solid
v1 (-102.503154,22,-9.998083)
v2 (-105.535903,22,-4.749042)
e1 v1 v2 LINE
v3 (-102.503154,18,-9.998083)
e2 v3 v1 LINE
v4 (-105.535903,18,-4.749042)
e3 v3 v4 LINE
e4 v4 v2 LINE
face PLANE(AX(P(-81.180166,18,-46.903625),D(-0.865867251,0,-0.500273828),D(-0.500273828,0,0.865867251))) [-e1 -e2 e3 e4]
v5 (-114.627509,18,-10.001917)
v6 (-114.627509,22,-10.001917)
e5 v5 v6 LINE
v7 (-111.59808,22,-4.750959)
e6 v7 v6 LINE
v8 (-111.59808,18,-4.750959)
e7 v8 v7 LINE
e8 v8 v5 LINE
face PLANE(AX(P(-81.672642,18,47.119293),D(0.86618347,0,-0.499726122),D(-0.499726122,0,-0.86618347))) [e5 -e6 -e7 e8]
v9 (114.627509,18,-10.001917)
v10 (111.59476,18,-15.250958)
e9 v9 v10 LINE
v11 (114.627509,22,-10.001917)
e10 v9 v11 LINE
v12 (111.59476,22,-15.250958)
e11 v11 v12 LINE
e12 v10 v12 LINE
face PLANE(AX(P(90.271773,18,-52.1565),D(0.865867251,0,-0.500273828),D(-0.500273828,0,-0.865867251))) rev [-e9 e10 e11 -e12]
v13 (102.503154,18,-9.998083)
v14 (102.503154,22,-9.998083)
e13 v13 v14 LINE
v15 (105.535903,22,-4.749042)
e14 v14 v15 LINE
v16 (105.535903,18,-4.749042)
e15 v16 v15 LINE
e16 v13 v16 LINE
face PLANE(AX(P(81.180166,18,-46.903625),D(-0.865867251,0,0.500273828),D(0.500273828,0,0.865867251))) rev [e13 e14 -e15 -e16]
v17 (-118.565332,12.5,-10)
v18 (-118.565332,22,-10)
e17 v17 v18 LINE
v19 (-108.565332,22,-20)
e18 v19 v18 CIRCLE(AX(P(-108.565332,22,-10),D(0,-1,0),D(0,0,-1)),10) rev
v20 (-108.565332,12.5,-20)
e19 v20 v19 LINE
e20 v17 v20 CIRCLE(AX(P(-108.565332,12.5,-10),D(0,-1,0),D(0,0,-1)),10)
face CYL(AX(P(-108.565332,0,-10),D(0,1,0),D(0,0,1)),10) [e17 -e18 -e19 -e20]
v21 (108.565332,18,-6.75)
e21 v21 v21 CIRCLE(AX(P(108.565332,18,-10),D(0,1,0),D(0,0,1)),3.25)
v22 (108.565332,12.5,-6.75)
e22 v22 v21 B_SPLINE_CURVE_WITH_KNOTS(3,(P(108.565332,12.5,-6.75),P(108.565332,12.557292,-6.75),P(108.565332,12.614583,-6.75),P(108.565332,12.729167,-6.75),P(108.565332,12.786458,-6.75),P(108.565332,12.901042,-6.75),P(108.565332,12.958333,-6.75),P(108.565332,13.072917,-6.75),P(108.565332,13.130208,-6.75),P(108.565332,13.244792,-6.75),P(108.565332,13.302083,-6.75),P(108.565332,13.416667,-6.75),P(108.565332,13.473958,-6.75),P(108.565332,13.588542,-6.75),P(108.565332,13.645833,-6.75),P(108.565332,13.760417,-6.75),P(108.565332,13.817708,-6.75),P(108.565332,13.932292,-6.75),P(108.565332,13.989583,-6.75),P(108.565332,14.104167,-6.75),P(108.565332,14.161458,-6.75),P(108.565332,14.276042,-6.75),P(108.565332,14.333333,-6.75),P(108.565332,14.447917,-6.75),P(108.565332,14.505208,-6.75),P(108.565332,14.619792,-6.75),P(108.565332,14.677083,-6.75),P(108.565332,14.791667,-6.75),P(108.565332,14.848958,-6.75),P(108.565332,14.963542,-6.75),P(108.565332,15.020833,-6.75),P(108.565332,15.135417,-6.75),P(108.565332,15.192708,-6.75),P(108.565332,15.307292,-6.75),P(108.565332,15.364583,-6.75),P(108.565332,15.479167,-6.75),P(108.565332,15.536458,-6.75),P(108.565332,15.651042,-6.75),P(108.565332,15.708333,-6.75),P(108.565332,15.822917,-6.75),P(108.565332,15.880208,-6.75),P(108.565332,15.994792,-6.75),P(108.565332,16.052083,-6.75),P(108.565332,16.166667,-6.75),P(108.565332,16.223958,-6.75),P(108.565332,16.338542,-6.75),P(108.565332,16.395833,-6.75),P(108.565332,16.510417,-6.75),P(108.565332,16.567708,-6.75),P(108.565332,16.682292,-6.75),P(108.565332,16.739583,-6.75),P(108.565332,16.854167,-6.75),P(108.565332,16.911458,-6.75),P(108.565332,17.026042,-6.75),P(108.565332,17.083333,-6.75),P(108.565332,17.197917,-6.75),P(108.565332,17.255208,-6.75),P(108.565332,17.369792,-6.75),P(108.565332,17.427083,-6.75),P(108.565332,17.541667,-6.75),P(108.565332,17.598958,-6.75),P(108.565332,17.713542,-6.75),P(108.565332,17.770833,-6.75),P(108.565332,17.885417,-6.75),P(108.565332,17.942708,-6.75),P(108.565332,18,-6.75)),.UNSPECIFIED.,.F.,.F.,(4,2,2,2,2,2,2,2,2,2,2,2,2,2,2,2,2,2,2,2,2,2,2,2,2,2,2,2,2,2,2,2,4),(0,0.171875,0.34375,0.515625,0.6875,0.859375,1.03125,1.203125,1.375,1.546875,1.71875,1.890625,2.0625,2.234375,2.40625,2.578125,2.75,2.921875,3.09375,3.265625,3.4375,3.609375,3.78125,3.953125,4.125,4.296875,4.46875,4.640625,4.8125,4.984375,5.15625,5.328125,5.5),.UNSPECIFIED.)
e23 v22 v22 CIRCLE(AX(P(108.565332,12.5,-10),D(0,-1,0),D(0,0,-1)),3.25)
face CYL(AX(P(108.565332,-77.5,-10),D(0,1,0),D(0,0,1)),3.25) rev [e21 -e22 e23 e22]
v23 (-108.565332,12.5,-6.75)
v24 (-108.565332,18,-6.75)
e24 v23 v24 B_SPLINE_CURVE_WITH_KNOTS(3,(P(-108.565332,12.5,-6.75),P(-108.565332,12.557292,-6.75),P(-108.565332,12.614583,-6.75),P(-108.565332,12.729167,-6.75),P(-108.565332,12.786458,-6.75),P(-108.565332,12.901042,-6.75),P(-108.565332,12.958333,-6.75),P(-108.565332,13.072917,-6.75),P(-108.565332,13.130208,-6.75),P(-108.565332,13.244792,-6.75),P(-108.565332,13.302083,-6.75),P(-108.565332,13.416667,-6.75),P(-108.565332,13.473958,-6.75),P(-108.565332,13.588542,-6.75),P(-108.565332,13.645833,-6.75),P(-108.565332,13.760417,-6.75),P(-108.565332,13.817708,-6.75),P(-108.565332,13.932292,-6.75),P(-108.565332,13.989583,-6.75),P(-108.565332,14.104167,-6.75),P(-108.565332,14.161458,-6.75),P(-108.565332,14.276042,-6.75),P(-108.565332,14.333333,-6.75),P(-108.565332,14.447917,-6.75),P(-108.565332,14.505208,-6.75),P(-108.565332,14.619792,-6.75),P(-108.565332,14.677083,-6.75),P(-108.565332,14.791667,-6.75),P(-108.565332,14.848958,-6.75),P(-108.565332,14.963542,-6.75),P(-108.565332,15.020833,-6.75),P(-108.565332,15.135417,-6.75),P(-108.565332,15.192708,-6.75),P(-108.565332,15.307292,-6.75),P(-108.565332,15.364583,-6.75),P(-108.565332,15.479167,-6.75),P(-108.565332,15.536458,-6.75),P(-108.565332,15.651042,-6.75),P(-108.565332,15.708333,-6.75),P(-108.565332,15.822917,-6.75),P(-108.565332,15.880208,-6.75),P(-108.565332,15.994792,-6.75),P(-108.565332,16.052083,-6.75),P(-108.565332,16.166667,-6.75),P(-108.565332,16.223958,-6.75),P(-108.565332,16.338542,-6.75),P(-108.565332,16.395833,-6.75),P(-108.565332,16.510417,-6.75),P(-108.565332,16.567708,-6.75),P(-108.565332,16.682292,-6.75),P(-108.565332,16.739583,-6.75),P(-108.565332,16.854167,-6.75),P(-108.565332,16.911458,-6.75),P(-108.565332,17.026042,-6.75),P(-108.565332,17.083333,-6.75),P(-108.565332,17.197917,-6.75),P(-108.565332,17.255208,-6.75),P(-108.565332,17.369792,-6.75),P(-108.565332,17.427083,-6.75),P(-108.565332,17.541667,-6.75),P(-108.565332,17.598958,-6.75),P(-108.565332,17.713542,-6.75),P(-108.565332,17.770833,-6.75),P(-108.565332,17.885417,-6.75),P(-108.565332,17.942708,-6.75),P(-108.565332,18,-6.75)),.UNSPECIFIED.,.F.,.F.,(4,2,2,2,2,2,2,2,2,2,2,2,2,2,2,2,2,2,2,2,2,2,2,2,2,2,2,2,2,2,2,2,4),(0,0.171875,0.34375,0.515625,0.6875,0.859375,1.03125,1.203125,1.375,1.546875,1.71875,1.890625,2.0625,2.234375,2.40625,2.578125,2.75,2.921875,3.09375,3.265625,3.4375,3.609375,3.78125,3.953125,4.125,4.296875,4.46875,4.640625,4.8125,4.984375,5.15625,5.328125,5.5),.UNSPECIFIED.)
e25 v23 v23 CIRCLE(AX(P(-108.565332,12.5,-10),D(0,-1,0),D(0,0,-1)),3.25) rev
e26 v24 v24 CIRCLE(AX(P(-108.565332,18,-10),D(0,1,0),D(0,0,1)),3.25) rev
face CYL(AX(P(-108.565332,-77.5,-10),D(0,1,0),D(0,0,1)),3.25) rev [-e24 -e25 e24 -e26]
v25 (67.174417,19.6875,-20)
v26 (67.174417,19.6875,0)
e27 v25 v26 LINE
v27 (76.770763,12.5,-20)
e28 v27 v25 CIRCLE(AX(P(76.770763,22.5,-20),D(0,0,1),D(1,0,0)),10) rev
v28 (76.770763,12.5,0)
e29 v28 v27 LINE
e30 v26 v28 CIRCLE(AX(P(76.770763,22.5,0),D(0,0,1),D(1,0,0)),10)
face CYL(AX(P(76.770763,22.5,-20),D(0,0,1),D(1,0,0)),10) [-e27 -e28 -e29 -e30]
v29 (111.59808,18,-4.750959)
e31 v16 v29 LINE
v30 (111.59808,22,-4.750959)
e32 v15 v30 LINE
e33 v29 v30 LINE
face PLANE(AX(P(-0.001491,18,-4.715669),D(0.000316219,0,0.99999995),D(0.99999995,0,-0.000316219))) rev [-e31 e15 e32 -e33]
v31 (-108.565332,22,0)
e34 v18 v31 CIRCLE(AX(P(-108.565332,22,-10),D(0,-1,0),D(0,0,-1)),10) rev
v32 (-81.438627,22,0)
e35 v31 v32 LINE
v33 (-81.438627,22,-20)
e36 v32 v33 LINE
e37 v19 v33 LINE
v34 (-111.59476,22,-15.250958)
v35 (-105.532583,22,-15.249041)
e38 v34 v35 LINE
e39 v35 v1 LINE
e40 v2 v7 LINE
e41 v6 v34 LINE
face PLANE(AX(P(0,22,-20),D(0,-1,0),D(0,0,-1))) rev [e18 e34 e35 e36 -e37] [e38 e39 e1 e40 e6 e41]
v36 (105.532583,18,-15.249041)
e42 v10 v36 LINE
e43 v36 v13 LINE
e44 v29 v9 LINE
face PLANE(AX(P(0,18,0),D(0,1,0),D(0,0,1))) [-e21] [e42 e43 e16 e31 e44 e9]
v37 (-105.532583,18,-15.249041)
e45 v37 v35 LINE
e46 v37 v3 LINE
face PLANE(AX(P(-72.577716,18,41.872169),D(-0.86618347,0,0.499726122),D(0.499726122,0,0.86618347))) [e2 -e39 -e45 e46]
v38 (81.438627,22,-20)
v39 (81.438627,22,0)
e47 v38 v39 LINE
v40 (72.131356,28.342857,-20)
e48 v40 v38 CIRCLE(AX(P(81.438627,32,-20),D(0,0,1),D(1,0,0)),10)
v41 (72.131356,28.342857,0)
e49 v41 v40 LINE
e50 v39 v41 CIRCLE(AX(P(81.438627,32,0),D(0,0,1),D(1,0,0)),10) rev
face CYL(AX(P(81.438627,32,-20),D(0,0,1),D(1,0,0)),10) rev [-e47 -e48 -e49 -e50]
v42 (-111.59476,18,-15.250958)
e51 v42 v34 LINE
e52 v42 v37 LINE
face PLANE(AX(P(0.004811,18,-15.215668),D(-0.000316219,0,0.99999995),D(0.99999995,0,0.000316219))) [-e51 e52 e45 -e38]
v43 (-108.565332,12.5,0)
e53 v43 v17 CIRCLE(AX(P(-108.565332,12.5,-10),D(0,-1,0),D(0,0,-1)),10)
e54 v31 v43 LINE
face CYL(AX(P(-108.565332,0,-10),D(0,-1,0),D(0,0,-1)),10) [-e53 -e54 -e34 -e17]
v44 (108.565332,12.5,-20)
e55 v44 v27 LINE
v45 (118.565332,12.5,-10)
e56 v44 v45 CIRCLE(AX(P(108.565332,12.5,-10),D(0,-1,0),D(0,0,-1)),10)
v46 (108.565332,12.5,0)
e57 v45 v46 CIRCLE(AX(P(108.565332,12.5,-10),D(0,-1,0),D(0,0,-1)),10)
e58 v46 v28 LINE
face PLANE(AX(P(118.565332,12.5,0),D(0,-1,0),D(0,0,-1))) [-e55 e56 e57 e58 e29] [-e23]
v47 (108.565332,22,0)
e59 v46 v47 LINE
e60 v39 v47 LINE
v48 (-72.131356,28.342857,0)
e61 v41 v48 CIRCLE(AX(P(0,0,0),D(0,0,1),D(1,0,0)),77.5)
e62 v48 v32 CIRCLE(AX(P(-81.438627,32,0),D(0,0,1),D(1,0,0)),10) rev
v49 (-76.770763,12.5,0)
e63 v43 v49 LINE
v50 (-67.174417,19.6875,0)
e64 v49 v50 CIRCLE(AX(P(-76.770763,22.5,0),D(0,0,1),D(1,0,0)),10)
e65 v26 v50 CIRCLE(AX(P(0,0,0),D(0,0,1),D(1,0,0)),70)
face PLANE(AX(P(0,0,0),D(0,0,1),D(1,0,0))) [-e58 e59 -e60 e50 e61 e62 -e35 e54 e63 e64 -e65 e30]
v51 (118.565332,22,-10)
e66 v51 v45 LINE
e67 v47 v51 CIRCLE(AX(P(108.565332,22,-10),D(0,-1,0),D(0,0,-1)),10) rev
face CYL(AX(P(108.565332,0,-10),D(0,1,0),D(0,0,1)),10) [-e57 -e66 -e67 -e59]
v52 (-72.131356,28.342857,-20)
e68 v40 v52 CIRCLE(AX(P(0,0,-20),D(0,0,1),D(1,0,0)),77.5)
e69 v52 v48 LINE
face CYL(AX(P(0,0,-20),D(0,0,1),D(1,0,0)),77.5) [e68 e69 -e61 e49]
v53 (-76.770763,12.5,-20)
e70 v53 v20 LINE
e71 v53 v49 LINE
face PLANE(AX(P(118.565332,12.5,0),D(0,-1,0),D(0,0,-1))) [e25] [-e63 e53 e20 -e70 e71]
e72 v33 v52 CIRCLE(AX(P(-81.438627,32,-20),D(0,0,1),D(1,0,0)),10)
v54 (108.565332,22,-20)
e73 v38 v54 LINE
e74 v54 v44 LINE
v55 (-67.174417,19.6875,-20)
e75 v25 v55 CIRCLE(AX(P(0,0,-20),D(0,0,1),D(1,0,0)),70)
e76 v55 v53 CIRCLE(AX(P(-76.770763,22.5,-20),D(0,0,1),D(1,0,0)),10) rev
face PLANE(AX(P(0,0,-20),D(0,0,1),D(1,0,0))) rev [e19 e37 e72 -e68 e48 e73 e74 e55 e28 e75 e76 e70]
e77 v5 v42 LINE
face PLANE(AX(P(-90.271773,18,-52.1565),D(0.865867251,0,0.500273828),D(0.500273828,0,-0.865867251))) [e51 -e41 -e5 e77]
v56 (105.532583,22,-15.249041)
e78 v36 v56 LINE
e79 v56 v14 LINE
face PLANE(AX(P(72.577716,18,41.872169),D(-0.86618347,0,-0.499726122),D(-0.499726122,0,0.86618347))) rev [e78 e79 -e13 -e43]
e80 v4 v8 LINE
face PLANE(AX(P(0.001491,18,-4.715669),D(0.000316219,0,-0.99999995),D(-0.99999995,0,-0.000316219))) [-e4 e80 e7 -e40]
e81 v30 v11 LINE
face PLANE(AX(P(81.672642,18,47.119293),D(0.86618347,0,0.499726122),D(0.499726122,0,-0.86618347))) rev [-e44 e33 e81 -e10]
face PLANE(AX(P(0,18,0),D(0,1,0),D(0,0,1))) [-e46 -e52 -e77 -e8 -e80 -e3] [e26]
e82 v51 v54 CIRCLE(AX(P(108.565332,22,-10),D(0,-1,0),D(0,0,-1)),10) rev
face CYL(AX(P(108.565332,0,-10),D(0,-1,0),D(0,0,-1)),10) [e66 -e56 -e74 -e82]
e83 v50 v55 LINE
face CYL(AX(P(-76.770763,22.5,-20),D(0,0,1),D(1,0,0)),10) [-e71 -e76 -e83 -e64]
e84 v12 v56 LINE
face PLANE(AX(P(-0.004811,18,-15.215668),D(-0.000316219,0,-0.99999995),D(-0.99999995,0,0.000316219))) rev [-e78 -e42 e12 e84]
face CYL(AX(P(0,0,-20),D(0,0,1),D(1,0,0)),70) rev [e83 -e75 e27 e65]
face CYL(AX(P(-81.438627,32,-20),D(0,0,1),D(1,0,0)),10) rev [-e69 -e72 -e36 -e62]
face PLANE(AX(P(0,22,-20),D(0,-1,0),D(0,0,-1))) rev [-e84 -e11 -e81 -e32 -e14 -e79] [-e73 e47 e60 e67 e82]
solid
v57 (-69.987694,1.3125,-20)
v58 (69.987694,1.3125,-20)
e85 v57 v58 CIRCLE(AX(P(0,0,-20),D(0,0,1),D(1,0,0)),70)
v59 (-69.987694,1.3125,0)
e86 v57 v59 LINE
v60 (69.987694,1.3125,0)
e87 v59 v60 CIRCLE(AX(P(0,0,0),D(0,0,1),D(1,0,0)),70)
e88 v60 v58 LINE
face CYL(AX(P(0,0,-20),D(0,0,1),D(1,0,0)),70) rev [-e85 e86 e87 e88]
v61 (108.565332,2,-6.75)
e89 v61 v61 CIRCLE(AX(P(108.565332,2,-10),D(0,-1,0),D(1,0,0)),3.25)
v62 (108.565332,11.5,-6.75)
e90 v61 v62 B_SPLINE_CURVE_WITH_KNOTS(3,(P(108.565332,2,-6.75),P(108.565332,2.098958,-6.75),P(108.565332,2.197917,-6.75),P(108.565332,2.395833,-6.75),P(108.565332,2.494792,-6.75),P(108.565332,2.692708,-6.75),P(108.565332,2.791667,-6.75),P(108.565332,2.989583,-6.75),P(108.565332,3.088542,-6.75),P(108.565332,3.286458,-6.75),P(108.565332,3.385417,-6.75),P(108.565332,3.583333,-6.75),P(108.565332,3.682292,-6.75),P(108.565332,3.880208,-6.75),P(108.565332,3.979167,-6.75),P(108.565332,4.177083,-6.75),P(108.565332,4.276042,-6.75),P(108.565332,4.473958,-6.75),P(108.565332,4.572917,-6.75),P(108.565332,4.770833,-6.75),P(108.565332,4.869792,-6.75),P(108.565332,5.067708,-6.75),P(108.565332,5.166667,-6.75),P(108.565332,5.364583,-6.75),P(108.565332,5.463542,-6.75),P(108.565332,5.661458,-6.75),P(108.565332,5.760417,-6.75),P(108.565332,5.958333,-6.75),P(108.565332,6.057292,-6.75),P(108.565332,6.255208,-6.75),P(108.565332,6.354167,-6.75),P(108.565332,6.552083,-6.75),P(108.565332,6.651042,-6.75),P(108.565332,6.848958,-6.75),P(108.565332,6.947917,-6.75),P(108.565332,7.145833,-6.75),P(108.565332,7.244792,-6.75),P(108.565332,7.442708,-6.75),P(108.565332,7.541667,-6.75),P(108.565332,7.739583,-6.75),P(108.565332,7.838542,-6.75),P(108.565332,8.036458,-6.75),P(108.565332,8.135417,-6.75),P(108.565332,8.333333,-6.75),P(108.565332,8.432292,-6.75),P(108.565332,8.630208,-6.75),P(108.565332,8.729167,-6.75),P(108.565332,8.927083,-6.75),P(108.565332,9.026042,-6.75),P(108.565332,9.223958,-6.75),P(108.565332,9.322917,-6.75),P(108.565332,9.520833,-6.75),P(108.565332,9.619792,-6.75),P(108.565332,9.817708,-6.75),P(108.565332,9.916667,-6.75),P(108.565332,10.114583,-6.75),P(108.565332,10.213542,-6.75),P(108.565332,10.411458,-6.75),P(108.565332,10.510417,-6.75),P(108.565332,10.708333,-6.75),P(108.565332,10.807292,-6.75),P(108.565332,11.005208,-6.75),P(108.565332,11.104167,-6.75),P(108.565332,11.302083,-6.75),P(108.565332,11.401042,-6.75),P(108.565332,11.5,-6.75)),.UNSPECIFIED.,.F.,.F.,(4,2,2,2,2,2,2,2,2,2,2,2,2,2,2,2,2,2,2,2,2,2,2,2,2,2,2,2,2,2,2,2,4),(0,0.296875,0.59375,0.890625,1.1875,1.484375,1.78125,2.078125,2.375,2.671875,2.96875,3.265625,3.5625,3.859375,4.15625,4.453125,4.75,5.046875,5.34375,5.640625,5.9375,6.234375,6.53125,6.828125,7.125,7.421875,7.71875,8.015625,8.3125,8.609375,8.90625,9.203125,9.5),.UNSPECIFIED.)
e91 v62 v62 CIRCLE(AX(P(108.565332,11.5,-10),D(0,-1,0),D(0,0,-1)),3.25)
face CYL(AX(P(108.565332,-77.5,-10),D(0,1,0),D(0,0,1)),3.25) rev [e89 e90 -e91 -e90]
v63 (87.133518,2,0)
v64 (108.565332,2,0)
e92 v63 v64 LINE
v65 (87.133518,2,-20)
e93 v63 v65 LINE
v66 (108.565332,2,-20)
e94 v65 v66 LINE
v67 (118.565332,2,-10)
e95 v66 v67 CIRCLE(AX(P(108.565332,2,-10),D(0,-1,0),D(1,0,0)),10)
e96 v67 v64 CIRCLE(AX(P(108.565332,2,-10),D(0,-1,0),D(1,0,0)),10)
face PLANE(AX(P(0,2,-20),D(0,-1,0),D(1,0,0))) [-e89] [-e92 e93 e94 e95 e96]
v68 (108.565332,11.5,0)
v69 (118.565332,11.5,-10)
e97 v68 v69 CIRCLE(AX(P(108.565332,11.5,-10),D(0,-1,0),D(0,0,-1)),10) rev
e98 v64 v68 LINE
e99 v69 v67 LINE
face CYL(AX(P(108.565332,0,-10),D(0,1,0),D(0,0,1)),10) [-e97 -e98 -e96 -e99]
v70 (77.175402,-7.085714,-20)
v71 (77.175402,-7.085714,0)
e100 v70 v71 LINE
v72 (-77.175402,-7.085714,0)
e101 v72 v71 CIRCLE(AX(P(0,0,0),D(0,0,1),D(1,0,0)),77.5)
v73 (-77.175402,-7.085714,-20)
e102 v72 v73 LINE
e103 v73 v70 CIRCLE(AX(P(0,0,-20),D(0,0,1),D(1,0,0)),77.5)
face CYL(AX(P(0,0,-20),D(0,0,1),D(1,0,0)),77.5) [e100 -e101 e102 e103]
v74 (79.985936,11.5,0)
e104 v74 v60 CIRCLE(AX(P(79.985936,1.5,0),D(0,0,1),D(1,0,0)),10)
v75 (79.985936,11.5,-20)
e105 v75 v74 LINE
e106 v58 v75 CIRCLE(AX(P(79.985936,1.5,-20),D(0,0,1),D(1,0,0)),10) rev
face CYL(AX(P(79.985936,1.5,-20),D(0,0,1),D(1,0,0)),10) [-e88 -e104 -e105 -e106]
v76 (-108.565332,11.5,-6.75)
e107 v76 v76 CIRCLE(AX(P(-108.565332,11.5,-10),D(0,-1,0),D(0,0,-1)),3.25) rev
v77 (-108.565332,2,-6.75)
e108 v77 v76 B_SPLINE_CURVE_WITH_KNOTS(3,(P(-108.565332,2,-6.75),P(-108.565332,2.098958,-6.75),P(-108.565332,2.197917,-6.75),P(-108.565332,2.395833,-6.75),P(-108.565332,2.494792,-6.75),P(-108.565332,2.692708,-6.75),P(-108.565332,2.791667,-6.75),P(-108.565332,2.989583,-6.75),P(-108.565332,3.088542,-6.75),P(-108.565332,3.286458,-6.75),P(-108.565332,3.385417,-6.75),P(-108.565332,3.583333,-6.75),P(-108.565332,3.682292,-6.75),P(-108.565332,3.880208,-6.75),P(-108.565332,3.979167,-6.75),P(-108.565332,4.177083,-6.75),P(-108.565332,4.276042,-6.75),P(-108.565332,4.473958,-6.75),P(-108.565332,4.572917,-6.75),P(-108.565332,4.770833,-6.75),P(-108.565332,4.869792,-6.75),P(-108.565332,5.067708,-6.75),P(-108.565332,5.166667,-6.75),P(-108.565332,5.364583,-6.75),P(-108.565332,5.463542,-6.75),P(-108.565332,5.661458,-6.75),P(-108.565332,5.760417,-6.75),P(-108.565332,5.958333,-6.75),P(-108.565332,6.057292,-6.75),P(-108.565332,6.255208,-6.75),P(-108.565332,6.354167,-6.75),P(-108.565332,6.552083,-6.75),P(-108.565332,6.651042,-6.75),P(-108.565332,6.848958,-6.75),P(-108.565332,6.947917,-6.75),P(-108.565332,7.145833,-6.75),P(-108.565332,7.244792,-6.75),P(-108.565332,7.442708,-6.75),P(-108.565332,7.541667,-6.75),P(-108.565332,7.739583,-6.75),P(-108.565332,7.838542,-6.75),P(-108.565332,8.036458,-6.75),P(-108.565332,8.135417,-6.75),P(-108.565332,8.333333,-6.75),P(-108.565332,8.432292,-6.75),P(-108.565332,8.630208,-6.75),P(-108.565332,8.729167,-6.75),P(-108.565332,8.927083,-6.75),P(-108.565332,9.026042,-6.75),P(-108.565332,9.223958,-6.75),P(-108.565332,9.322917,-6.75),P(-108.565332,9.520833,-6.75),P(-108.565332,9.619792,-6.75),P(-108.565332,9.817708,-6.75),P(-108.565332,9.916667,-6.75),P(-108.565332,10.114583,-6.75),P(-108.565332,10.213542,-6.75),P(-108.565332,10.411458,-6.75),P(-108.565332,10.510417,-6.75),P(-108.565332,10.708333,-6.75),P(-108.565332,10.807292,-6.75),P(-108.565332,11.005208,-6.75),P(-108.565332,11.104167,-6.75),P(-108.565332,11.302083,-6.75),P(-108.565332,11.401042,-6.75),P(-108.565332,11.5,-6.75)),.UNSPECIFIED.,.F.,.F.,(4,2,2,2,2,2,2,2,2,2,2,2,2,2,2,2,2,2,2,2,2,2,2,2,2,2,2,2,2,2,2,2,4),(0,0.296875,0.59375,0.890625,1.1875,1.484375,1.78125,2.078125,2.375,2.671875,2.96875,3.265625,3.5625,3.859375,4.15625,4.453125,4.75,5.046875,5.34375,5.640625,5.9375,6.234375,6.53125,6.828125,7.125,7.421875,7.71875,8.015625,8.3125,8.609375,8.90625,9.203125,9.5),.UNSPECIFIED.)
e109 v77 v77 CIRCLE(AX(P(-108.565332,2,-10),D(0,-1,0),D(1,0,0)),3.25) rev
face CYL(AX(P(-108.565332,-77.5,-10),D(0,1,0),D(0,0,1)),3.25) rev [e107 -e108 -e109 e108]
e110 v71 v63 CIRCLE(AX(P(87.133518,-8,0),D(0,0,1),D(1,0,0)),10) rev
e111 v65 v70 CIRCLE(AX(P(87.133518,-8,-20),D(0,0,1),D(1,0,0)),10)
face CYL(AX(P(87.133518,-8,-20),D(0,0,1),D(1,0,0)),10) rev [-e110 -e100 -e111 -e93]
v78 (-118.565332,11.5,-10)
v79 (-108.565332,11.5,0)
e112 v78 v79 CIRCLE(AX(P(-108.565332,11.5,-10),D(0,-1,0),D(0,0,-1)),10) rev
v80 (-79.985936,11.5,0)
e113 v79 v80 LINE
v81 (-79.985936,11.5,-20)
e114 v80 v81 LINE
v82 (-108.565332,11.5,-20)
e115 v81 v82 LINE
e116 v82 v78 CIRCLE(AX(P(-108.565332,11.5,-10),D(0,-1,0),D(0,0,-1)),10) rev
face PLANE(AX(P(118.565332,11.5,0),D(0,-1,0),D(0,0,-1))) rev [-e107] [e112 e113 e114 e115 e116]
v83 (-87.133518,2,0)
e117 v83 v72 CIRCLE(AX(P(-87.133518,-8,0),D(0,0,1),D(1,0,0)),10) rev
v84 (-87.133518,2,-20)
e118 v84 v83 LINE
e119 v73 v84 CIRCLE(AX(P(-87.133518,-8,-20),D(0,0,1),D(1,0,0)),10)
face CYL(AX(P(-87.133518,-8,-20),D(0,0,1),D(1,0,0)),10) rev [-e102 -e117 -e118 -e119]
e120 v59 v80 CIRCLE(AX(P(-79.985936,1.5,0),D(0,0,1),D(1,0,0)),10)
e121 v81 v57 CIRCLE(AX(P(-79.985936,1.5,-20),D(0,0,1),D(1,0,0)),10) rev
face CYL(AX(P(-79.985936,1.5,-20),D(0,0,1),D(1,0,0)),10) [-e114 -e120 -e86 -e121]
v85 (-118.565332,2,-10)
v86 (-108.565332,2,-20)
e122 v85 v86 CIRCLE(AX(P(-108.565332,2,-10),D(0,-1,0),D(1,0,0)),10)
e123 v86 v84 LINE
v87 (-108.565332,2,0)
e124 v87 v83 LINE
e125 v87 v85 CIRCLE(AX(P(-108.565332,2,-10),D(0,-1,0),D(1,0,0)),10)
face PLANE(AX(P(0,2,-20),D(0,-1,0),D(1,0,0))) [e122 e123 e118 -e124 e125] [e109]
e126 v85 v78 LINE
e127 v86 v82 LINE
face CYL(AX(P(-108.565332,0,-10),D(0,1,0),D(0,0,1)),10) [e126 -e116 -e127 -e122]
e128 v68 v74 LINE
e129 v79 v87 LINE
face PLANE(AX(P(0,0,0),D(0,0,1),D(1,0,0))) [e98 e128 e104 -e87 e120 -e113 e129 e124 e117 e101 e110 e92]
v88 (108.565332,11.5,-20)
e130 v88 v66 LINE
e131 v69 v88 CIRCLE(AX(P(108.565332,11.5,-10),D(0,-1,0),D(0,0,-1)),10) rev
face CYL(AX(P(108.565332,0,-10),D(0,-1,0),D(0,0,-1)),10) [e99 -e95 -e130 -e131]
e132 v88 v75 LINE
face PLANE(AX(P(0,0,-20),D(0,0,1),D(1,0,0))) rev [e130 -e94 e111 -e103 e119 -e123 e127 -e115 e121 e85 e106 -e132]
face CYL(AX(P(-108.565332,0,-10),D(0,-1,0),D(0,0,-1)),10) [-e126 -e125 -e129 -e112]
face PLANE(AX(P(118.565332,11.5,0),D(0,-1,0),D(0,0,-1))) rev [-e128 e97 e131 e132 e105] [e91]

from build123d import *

# Parameters (mm, degrees)
SKETCH2_R               = 70
BOSS_EXTRUDE1_DEPTH     = 20
CUT_EXTRUDE1_DEPTH      = 251.274252393
CUT_EXTRUDE1_DEPTH_BACK = 251.274252393
SKETCH4_W               = 20
SKETCH4_H               = 1
FILLET1_R               = 10
FILLET2_R               = 10
FILLET3_R               = 10
FILLET4_R               = 10
CUT_EXTRUDE2_DEPTH      = 4
SKETCH6_R               = 3.25
CUT_EXTRUDE3_DEPTH      = 154.551254807


with BuildPart() as part:
    # Sketch2 → Boss-Extrude1 (new body)
    with BuildSketch(Plane.XY):
        with BuildLine():
            Line((-118.56533158, 2), (-77.47418925, 2))
            ThreePointArc((-77.47418925, 2), (0, -77.5), (77.47418925, 2))
            Line((77.47418925, 2), (118.56533158, 2))
            Line((118.56533158, 2), (118.56533158, 22))
            Line((118.56533158, 22), (74.311842932, 22))
            ThreePointArc((74.311842932, 22), (0, 77.5), (-74.311842932, 22))
            Line((-74.311842932, 22), (-118.56533158, 22))
            Line((-118.56533158, 22), (-118.56533158, 2))
        make_face()
        Circle(SKETCH2_R, mode=Mode.SUBTRACT)
    extrude(amount=-BOSS_EXTRUDE1_DEPTH)

    # Sketch4 → Cut-Extrude1 (cut, two sides: drawn at the far end of the back side and taken through both)
    with BuildSketch(Plane.ZY.offset(118.56533158).offset(-CUT_EXTRUDE1_DEPTH_BACK)):
        with Locations((-10, 12)):
            Rectangle(SKETCH4_W, SKETCH4_H)
    extrude(amount=CUT_EXTRUDE1_DEPTH + CUT_EXTRUDE1_DEPTH_BACK, mode=Mode.SUBTRACT)


with BuildPart() as cut_extrude1_piece_1:
    # of the separate pieces the step leaves, piece 1, a body of its own (cut_extrude1_pieces)
    add(part.part.solids().sort_by_distance((-118.56533158, 11.5, 0))[0])

    # Fillet2
    fillet2_edges = [cut_extrude1_piece_1.edges().sort_by_distance(p)[0] for p in [
        (-77.47418925, 2, -10),
        (77.47418925, 2, -10),
        (-69.048895719, 11.5, -10),
        (69.048895719, 11.5, -10),
    ]]
    fillet(fillet2_edges, radius=FILLET2_R)

    # Fillet4
    fillet4_edges = [cut_extrude1_piece_1.edges().sort_by_distance(p)[0] for p in [
        (118.56533158, 6.75, 0),
        (118.56533158, 6.75, -20),
        (-118.56533158, 6.75, 0),
        (-118.56533158, 6.75, -20),
    ]]
    fillet(fillet4_edges, radius=FILLET4_R - 0.0001)  # a hair under: the kernel refuses the full size


with BuildPart() as cut_extrude1_piece_2:
    # of the separate pieces the step leaves, piece 2, a body of its own (cut_extrude1_pieces)
    add(part.part.solids().sort_by_distance((-74.311842932, 22, 0))[0])

    # Fillet1
    fillet1_edges = [cut_extrude1_piece_2.edges().sort_by_distance(p)[0] for p in [
        (-74.311842932, 22, -10),
        (74.311842932, 22, -10),
        (68.87488657, 12.5, -10),
        (-68.87488657, 12.5, -10),
    ]]
    fillet(fillet1_edges, radius=FILLET1_R)

    # Fillet3
    fillet3_edges = [cut_extrude1_piece_2.edges().sort_by_distance(p)[0] for p in [
        (-118.56533158, 17.25, 0),
        (-118.56533158, 17.25, -20),
        (118.56533158, 17.25, 0),
        (118.56533158, 17.25, -20),
    ]]
    fillet(fillet3_edges, radius=FILLET3_R - 0.0001)  # a hair under: the kernel refuses the full size

    # Sketch5 → Cut-Extrude2 (cut)
    with BuildSketch(Plane(origin=(0, 22, 0), x_dir=(-1, 0, 0), z_dir=(0, -1, 0))):
        Polygon((-114.627509104, 10.001916974), (-111.594760194, 15.250958224), (-105.532582671, 15.249041251), (-102.503154057, 9.998083026), (-105.535902967, 4.749041776), (-111.59808049, 4.750958749), align=None)
        Polygon((111.594760194, 15.250958224), (105.532582671, 15.249041251), (102.503154057, 9.998083026), (105.535902967, 4.749041776), (111.59808049, 4.750958749), (114.627509104, 10.001916974), align=None)
    extrude(amount=CUT_EXTRUDE2_DEPTH, mode=Mode.SUBTRACT)


with BuildPart() as cut_extrude3_tool:
    # Sketch6 → Cut-Extrude3 (new, through all)
    with BuildSketch(Plane(origin=(0, 18, 0), x_dir=(-1, 0, 0), z_dir=(0, -1, 0))):
        with BuildLine():
            ThreePointArc((111.81533158, 10), (110.189886548, 12.814839455), (106.939441638, 12.814068566))
            Line((106.939441638, 12.814068566), (110.191221523, 7.185931434))
            ThreePointArc((110.191221523, 7.185931434), (111.380171035, 8.375445032), (111.81533158, 10))
        make_face()
        with BuildLine():
            Line((110.191221523, 7.185931434), (106.939441638, 12.814068566))
            ThreePointArc((106.939441638, 12.814068566), (105.751263014, 8.374110058), (110.191221523, 7.185931434))
        make_face()
        with Locations(Location((-108.56533158, 10, 0), (0, 0, 270))):
            Circle(SKETCH6_R)
    extrude(amount=CUT_EXTRUDE3_DEPTH)


with BuildPart() as cut_extrude1_piece_1_1:
    add(cut_extrude1_piece_1.part)

    # Cut-Extrude3: cut by cut_extrude3_tool
    add(cut_extrude3_tool.part, mode=Mode.SUBTRACT)


with BuildPart() as cut_extrude1_piece_2_1:
    add(cut_extrude1_piece_2.part)

    # Cut-Extrude3: cut by cut_extrude3_tool
    add(cut_extrude3_tool.part, mode=Mode.SUBTRACT)


solid = Compound([cut_extrude1_piece_1_1.part, cut_extrude1_piece_2_1.part])
